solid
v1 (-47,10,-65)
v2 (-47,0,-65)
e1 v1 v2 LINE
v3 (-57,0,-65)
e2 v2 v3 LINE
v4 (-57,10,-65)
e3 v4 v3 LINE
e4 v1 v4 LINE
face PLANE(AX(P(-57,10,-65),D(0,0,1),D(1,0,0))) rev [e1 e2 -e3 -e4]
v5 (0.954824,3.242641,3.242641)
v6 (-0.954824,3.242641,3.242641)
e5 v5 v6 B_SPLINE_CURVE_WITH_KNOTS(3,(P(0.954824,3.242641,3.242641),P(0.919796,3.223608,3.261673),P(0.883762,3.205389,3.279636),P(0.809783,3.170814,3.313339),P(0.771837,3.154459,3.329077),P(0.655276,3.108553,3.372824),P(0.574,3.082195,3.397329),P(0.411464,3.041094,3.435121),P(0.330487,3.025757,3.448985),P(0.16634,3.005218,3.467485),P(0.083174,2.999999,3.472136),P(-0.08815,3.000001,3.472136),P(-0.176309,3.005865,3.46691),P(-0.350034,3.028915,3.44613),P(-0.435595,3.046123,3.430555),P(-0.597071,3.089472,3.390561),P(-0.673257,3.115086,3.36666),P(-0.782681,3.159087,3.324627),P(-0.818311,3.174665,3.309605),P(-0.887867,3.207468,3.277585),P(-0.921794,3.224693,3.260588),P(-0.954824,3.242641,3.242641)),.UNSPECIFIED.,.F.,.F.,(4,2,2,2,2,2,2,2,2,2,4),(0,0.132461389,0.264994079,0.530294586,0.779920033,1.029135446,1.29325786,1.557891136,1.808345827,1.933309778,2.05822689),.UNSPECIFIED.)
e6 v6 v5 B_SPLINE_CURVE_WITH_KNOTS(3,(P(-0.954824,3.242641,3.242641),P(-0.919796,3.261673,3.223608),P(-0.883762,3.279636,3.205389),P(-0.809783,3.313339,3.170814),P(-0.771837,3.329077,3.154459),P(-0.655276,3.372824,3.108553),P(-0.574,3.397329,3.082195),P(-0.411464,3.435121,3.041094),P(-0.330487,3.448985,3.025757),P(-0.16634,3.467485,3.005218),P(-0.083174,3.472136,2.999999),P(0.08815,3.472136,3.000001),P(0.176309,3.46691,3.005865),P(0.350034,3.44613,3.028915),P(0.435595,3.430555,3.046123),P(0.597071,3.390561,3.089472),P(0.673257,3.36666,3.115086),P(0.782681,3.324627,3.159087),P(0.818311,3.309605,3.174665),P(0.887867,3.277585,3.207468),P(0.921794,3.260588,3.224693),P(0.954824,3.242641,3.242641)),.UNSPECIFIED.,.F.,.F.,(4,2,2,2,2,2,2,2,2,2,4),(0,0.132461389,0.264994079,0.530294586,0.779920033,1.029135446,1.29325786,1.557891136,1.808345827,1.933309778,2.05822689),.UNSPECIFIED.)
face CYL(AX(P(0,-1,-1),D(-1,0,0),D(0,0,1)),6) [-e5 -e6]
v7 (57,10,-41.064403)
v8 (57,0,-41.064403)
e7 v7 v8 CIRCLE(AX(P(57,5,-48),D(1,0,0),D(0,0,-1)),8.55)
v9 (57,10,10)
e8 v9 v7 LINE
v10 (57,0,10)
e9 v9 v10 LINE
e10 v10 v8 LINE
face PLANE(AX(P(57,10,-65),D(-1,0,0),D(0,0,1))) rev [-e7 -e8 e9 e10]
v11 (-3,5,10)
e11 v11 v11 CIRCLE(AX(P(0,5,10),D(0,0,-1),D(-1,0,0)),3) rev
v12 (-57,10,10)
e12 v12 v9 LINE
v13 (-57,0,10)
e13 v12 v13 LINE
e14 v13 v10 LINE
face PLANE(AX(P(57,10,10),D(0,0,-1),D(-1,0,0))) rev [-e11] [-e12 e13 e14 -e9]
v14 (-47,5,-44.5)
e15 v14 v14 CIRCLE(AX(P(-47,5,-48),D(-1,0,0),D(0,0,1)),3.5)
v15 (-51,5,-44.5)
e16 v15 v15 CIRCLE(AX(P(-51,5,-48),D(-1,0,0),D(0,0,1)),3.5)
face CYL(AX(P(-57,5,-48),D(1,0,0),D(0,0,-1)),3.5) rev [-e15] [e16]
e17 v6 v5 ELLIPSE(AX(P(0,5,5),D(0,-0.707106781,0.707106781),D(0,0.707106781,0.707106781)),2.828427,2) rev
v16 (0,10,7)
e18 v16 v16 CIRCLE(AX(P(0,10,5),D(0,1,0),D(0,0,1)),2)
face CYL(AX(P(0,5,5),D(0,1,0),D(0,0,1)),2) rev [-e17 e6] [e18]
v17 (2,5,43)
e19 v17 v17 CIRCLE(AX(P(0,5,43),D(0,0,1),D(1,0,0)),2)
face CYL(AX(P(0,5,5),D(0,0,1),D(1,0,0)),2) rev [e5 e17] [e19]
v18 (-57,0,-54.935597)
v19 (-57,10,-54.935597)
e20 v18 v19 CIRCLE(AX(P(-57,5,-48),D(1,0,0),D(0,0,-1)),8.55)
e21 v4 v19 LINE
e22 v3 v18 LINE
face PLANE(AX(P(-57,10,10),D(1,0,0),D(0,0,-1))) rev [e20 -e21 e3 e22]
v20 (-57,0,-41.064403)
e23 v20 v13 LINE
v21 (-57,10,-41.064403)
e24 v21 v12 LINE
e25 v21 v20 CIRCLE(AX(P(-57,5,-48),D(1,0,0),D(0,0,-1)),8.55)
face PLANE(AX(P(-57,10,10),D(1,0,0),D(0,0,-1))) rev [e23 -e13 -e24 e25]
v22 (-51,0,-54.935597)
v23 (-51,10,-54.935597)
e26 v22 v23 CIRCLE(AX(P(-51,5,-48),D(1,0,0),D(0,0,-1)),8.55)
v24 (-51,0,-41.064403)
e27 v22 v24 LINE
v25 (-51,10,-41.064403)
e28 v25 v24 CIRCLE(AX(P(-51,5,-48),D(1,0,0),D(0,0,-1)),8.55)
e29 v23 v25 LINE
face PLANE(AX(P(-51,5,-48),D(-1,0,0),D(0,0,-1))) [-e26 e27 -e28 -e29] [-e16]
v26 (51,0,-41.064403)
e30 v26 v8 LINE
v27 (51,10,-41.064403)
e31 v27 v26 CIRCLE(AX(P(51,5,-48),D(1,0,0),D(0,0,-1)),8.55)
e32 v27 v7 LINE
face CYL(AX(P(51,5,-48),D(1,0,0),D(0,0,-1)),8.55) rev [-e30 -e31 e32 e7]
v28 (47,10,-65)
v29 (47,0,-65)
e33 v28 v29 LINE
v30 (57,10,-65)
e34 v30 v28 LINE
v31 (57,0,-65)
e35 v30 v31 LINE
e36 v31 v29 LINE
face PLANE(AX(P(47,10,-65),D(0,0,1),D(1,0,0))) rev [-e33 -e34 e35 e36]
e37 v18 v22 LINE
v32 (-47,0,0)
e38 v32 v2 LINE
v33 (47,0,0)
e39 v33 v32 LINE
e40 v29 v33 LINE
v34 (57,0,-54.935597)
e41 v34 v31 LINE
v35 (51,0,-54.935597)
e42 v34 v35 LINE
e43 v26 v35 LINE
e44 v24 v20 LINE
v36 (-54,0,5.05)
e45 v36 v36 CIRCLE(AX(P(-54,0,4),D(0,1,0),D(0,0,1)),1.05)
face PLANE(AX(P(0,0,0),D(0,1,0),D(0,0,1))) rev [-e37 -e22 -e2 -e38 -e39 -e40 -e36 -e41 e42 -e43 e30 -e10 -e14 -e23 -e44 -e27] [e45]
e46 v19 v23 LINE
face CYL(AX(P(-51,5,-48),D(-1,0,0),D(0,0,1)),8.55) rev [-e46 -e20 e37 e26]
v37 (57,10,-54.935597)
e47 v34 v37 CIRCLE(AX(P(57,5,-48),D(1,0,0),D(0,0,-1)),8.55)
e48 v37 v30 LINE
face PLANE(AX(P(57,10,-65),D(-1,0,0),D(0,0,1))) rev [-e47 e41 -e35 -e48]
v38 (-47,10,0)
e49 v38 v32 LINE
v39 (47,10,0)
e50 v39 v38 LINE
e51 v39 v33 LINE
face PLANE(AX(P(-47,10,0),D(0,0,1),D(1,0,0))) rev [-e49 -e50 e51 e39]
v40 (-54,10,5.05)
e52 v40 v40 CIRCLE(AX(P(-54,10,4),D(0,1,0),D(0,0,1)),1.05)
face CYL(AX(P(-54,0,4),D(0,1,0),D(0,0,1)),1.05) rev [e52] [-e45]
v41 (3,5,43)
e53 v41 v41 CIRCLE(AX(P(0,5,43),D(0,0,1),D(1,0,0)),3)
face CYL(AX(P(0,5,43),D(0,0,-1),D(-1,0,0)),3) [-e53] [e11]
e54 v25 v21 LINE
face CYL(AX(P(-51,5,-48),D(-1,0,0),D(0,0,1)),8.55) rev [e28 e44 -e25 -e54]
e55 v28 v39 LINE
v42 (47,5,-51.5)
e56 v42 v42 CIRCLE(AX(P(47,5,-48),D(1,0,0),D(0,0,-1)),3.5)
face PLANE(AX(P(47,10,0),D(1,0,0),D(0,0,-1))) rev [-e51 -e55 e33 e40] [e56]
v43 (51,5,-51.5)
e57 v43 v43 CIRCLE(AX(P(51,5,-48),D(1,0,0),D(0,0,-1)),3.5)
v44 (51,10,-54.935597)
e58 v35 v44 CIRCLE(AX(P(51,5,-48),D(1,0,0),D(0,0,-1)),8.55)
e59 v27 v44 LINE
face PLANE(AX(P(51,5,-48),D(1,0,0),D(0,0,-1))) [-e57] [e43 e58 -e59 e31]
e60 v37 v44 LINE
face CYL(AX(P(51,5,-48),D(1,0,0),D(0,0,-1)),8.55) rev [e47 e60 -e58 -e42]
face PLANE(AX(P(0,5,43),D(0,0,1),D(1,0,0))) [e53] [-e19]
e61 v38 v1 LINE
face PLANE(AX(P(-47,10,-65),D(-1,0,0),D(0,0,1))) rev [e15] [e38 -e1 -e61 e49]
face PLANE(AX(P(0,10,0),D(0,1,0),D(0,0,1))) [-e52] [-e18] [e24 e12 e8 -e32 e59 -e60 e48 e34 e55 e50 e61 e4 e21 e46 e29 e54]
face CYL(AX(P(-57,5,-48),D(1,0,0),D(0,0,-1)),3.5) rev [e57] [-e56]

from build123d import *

# Parameters (mm, degrees)
BOSS_EXTRUDE1_DEPTH = 10
SKETCH2_R           = 8.55
CUT_EXTRUDE1_DEPTH  = 6
SKETCH3_R           = 3.5
CUT_EXTRUDE2_DEPTH  = 127.447617613
SKETCH4_R           = 3
BOSS_EXTRUDE2_DEPTH = 33
SKETCH5_R           = 1.05
CUT_EXTRUDE3_DEPTH  = 88.028730888
SKETCH6_R           = 2
CUT_EXTRUDE4_DEPTH  = 38
SKETCH7_R           = 2
CUT_EXTRUDE5_DEPTH  = 5
FILLET2_R           = 6


with BuildPart() as part:
    # Sketch1 → Boss-Extrude1 (new body)
    with BuildSketch(Plane(origin=(0, 0, 0), x_dir=(1, 0, 0), z_dir=(0, 1, 0))):
        Polygon((-47, 0), (47, 0), (47, 65), (57, 65), (57, -10), (-57, -10), (-57, 65), (-47, 65), align=None)
    extrude(amount=BOSS_EXTRUDE1_DEPTH)

    # Sketch2 → Cut-Extrude1 (cut)
    with BuildSketch(Plane(origin=(57, 0, 0), x_dir=(0, 0, -1), z_dir=(1, 0, 0))):
        with Locations((48, 5)):
            Circle(SKETCH2_R)
    cut_extrude1 = extrude(amount=-CUT_EXTRUDE1_DEPTH, mode=Mode.SUBTRACT)

    # Mirror1: Cut-Extrude1 across plane
    add(cut_extrude1.mirror(Plane(origin=(0, 0, 0), x_dir=(0, 0, 1), z_dir=(1, 0, 0))), mode=Mode.SUBTRACT)

    # Sketch3 → Cut-Extrude2 (cut, through all)
    with BuildSketch(Plane(origin=(51, 0, 0), x_dir=(0, 0, -1), z_dir=(1, 0, 0))):
        with Locations(Location((48, 5, 0), (0, 0, 180))):
            Circle(SKETCH3_R)
    extrude(amount=-CUT_EXTRUDE2_DEPTH, mode=Mode.SUBTRACT)

    # Sketch4 → Boss-Extrude2 (add)
    with BuildSketch(Plane.XY.offset(10)):
        with Locations(Location((0, 5, 0), (0, 0, 180))):
            Circle(SKETCH4_R)
    extrude(amount=BOSS_EXTRUDE2_DEPTH)

    # Sketch5 → Cut-Extrude3 (cut, through all)
    with BuildSketch(Plane(origin=(0, 10, 0), x_dir=(1, 0, 0), z_dir=(0, 1, 0))):
        with Locations(Location((-54, -4, 0), (0, 0, 270))):
            Circle(SKETCH5_R)
    extrude(amount=-CUT_EXTRUDE3_DEPTH, mode=Mode.SUBTRACT)

    # Sketch6 → Cut-Extrude4 (cut)
    with BuildSketch(Plane.XY.offset(43)):
        with Locations((0, 5)):
            Circle(SKETCH6_R)
    extrude(amount=-CUT_EXTRUDE4_DEPTH, mode=Mode.SUBTRACT)

    # Sketch7 → Cut-Extrude5 (cut)
    with BuildSketch(Plane(origin=(0, 10, 0), x_dir=(1, 0, 0), z_dir=(0, 1, 0))):
        with Locations(Location((0, -5, 0), (0, 0, 270))):
            Circle(SKETCH7_R)
    extrude(amount=-CUT_EXTRUDE5_DEPTH, mode=Mode.SUBTRACT)

    # Fillet2
    # the kernel refuses this fillet: 6 mm, written as the material it takes off along each edge
    with BuildSketch(Plane(origin=(17, 5, 5), x_dir=(0, 0, -1), z_dir=(-1, 0, 0))) as fillet2_piece_1_section:
        with BuildLine():
            CenterArc((FILLET2_R, FILLET2_R), FILLET2_R, 180, 90)
            Line((0, FILLET2_R), (0, 0))
            Line((0, 0), (FILLET2_R, 0))
        make_face()
    fillet2_piece_1 = extrude(amount=34, mode=Mode.PRIVATE)
    fillet2_piece_1 = fillet2_piece_1 & Plane(origin=(0, 4.127189323, 5), x_dir=(0, 0, 1), z_dir=(0, 1, 0)) * Cylinder(2, 92, mode=Mode.PRIVATE)
    fillet2_piece_1 = fillet2_piece_1 & Plane(origin=(0, 5, 4.127189323), x_dir=(1, 0, 0), z_dir=(0, 0, 1)) * Cylinder(2, 92, mode=Mode.PRIVATE)
    add(fillet2_piece_1, mode=Mode.SUBTRACT)


solid = part.part
